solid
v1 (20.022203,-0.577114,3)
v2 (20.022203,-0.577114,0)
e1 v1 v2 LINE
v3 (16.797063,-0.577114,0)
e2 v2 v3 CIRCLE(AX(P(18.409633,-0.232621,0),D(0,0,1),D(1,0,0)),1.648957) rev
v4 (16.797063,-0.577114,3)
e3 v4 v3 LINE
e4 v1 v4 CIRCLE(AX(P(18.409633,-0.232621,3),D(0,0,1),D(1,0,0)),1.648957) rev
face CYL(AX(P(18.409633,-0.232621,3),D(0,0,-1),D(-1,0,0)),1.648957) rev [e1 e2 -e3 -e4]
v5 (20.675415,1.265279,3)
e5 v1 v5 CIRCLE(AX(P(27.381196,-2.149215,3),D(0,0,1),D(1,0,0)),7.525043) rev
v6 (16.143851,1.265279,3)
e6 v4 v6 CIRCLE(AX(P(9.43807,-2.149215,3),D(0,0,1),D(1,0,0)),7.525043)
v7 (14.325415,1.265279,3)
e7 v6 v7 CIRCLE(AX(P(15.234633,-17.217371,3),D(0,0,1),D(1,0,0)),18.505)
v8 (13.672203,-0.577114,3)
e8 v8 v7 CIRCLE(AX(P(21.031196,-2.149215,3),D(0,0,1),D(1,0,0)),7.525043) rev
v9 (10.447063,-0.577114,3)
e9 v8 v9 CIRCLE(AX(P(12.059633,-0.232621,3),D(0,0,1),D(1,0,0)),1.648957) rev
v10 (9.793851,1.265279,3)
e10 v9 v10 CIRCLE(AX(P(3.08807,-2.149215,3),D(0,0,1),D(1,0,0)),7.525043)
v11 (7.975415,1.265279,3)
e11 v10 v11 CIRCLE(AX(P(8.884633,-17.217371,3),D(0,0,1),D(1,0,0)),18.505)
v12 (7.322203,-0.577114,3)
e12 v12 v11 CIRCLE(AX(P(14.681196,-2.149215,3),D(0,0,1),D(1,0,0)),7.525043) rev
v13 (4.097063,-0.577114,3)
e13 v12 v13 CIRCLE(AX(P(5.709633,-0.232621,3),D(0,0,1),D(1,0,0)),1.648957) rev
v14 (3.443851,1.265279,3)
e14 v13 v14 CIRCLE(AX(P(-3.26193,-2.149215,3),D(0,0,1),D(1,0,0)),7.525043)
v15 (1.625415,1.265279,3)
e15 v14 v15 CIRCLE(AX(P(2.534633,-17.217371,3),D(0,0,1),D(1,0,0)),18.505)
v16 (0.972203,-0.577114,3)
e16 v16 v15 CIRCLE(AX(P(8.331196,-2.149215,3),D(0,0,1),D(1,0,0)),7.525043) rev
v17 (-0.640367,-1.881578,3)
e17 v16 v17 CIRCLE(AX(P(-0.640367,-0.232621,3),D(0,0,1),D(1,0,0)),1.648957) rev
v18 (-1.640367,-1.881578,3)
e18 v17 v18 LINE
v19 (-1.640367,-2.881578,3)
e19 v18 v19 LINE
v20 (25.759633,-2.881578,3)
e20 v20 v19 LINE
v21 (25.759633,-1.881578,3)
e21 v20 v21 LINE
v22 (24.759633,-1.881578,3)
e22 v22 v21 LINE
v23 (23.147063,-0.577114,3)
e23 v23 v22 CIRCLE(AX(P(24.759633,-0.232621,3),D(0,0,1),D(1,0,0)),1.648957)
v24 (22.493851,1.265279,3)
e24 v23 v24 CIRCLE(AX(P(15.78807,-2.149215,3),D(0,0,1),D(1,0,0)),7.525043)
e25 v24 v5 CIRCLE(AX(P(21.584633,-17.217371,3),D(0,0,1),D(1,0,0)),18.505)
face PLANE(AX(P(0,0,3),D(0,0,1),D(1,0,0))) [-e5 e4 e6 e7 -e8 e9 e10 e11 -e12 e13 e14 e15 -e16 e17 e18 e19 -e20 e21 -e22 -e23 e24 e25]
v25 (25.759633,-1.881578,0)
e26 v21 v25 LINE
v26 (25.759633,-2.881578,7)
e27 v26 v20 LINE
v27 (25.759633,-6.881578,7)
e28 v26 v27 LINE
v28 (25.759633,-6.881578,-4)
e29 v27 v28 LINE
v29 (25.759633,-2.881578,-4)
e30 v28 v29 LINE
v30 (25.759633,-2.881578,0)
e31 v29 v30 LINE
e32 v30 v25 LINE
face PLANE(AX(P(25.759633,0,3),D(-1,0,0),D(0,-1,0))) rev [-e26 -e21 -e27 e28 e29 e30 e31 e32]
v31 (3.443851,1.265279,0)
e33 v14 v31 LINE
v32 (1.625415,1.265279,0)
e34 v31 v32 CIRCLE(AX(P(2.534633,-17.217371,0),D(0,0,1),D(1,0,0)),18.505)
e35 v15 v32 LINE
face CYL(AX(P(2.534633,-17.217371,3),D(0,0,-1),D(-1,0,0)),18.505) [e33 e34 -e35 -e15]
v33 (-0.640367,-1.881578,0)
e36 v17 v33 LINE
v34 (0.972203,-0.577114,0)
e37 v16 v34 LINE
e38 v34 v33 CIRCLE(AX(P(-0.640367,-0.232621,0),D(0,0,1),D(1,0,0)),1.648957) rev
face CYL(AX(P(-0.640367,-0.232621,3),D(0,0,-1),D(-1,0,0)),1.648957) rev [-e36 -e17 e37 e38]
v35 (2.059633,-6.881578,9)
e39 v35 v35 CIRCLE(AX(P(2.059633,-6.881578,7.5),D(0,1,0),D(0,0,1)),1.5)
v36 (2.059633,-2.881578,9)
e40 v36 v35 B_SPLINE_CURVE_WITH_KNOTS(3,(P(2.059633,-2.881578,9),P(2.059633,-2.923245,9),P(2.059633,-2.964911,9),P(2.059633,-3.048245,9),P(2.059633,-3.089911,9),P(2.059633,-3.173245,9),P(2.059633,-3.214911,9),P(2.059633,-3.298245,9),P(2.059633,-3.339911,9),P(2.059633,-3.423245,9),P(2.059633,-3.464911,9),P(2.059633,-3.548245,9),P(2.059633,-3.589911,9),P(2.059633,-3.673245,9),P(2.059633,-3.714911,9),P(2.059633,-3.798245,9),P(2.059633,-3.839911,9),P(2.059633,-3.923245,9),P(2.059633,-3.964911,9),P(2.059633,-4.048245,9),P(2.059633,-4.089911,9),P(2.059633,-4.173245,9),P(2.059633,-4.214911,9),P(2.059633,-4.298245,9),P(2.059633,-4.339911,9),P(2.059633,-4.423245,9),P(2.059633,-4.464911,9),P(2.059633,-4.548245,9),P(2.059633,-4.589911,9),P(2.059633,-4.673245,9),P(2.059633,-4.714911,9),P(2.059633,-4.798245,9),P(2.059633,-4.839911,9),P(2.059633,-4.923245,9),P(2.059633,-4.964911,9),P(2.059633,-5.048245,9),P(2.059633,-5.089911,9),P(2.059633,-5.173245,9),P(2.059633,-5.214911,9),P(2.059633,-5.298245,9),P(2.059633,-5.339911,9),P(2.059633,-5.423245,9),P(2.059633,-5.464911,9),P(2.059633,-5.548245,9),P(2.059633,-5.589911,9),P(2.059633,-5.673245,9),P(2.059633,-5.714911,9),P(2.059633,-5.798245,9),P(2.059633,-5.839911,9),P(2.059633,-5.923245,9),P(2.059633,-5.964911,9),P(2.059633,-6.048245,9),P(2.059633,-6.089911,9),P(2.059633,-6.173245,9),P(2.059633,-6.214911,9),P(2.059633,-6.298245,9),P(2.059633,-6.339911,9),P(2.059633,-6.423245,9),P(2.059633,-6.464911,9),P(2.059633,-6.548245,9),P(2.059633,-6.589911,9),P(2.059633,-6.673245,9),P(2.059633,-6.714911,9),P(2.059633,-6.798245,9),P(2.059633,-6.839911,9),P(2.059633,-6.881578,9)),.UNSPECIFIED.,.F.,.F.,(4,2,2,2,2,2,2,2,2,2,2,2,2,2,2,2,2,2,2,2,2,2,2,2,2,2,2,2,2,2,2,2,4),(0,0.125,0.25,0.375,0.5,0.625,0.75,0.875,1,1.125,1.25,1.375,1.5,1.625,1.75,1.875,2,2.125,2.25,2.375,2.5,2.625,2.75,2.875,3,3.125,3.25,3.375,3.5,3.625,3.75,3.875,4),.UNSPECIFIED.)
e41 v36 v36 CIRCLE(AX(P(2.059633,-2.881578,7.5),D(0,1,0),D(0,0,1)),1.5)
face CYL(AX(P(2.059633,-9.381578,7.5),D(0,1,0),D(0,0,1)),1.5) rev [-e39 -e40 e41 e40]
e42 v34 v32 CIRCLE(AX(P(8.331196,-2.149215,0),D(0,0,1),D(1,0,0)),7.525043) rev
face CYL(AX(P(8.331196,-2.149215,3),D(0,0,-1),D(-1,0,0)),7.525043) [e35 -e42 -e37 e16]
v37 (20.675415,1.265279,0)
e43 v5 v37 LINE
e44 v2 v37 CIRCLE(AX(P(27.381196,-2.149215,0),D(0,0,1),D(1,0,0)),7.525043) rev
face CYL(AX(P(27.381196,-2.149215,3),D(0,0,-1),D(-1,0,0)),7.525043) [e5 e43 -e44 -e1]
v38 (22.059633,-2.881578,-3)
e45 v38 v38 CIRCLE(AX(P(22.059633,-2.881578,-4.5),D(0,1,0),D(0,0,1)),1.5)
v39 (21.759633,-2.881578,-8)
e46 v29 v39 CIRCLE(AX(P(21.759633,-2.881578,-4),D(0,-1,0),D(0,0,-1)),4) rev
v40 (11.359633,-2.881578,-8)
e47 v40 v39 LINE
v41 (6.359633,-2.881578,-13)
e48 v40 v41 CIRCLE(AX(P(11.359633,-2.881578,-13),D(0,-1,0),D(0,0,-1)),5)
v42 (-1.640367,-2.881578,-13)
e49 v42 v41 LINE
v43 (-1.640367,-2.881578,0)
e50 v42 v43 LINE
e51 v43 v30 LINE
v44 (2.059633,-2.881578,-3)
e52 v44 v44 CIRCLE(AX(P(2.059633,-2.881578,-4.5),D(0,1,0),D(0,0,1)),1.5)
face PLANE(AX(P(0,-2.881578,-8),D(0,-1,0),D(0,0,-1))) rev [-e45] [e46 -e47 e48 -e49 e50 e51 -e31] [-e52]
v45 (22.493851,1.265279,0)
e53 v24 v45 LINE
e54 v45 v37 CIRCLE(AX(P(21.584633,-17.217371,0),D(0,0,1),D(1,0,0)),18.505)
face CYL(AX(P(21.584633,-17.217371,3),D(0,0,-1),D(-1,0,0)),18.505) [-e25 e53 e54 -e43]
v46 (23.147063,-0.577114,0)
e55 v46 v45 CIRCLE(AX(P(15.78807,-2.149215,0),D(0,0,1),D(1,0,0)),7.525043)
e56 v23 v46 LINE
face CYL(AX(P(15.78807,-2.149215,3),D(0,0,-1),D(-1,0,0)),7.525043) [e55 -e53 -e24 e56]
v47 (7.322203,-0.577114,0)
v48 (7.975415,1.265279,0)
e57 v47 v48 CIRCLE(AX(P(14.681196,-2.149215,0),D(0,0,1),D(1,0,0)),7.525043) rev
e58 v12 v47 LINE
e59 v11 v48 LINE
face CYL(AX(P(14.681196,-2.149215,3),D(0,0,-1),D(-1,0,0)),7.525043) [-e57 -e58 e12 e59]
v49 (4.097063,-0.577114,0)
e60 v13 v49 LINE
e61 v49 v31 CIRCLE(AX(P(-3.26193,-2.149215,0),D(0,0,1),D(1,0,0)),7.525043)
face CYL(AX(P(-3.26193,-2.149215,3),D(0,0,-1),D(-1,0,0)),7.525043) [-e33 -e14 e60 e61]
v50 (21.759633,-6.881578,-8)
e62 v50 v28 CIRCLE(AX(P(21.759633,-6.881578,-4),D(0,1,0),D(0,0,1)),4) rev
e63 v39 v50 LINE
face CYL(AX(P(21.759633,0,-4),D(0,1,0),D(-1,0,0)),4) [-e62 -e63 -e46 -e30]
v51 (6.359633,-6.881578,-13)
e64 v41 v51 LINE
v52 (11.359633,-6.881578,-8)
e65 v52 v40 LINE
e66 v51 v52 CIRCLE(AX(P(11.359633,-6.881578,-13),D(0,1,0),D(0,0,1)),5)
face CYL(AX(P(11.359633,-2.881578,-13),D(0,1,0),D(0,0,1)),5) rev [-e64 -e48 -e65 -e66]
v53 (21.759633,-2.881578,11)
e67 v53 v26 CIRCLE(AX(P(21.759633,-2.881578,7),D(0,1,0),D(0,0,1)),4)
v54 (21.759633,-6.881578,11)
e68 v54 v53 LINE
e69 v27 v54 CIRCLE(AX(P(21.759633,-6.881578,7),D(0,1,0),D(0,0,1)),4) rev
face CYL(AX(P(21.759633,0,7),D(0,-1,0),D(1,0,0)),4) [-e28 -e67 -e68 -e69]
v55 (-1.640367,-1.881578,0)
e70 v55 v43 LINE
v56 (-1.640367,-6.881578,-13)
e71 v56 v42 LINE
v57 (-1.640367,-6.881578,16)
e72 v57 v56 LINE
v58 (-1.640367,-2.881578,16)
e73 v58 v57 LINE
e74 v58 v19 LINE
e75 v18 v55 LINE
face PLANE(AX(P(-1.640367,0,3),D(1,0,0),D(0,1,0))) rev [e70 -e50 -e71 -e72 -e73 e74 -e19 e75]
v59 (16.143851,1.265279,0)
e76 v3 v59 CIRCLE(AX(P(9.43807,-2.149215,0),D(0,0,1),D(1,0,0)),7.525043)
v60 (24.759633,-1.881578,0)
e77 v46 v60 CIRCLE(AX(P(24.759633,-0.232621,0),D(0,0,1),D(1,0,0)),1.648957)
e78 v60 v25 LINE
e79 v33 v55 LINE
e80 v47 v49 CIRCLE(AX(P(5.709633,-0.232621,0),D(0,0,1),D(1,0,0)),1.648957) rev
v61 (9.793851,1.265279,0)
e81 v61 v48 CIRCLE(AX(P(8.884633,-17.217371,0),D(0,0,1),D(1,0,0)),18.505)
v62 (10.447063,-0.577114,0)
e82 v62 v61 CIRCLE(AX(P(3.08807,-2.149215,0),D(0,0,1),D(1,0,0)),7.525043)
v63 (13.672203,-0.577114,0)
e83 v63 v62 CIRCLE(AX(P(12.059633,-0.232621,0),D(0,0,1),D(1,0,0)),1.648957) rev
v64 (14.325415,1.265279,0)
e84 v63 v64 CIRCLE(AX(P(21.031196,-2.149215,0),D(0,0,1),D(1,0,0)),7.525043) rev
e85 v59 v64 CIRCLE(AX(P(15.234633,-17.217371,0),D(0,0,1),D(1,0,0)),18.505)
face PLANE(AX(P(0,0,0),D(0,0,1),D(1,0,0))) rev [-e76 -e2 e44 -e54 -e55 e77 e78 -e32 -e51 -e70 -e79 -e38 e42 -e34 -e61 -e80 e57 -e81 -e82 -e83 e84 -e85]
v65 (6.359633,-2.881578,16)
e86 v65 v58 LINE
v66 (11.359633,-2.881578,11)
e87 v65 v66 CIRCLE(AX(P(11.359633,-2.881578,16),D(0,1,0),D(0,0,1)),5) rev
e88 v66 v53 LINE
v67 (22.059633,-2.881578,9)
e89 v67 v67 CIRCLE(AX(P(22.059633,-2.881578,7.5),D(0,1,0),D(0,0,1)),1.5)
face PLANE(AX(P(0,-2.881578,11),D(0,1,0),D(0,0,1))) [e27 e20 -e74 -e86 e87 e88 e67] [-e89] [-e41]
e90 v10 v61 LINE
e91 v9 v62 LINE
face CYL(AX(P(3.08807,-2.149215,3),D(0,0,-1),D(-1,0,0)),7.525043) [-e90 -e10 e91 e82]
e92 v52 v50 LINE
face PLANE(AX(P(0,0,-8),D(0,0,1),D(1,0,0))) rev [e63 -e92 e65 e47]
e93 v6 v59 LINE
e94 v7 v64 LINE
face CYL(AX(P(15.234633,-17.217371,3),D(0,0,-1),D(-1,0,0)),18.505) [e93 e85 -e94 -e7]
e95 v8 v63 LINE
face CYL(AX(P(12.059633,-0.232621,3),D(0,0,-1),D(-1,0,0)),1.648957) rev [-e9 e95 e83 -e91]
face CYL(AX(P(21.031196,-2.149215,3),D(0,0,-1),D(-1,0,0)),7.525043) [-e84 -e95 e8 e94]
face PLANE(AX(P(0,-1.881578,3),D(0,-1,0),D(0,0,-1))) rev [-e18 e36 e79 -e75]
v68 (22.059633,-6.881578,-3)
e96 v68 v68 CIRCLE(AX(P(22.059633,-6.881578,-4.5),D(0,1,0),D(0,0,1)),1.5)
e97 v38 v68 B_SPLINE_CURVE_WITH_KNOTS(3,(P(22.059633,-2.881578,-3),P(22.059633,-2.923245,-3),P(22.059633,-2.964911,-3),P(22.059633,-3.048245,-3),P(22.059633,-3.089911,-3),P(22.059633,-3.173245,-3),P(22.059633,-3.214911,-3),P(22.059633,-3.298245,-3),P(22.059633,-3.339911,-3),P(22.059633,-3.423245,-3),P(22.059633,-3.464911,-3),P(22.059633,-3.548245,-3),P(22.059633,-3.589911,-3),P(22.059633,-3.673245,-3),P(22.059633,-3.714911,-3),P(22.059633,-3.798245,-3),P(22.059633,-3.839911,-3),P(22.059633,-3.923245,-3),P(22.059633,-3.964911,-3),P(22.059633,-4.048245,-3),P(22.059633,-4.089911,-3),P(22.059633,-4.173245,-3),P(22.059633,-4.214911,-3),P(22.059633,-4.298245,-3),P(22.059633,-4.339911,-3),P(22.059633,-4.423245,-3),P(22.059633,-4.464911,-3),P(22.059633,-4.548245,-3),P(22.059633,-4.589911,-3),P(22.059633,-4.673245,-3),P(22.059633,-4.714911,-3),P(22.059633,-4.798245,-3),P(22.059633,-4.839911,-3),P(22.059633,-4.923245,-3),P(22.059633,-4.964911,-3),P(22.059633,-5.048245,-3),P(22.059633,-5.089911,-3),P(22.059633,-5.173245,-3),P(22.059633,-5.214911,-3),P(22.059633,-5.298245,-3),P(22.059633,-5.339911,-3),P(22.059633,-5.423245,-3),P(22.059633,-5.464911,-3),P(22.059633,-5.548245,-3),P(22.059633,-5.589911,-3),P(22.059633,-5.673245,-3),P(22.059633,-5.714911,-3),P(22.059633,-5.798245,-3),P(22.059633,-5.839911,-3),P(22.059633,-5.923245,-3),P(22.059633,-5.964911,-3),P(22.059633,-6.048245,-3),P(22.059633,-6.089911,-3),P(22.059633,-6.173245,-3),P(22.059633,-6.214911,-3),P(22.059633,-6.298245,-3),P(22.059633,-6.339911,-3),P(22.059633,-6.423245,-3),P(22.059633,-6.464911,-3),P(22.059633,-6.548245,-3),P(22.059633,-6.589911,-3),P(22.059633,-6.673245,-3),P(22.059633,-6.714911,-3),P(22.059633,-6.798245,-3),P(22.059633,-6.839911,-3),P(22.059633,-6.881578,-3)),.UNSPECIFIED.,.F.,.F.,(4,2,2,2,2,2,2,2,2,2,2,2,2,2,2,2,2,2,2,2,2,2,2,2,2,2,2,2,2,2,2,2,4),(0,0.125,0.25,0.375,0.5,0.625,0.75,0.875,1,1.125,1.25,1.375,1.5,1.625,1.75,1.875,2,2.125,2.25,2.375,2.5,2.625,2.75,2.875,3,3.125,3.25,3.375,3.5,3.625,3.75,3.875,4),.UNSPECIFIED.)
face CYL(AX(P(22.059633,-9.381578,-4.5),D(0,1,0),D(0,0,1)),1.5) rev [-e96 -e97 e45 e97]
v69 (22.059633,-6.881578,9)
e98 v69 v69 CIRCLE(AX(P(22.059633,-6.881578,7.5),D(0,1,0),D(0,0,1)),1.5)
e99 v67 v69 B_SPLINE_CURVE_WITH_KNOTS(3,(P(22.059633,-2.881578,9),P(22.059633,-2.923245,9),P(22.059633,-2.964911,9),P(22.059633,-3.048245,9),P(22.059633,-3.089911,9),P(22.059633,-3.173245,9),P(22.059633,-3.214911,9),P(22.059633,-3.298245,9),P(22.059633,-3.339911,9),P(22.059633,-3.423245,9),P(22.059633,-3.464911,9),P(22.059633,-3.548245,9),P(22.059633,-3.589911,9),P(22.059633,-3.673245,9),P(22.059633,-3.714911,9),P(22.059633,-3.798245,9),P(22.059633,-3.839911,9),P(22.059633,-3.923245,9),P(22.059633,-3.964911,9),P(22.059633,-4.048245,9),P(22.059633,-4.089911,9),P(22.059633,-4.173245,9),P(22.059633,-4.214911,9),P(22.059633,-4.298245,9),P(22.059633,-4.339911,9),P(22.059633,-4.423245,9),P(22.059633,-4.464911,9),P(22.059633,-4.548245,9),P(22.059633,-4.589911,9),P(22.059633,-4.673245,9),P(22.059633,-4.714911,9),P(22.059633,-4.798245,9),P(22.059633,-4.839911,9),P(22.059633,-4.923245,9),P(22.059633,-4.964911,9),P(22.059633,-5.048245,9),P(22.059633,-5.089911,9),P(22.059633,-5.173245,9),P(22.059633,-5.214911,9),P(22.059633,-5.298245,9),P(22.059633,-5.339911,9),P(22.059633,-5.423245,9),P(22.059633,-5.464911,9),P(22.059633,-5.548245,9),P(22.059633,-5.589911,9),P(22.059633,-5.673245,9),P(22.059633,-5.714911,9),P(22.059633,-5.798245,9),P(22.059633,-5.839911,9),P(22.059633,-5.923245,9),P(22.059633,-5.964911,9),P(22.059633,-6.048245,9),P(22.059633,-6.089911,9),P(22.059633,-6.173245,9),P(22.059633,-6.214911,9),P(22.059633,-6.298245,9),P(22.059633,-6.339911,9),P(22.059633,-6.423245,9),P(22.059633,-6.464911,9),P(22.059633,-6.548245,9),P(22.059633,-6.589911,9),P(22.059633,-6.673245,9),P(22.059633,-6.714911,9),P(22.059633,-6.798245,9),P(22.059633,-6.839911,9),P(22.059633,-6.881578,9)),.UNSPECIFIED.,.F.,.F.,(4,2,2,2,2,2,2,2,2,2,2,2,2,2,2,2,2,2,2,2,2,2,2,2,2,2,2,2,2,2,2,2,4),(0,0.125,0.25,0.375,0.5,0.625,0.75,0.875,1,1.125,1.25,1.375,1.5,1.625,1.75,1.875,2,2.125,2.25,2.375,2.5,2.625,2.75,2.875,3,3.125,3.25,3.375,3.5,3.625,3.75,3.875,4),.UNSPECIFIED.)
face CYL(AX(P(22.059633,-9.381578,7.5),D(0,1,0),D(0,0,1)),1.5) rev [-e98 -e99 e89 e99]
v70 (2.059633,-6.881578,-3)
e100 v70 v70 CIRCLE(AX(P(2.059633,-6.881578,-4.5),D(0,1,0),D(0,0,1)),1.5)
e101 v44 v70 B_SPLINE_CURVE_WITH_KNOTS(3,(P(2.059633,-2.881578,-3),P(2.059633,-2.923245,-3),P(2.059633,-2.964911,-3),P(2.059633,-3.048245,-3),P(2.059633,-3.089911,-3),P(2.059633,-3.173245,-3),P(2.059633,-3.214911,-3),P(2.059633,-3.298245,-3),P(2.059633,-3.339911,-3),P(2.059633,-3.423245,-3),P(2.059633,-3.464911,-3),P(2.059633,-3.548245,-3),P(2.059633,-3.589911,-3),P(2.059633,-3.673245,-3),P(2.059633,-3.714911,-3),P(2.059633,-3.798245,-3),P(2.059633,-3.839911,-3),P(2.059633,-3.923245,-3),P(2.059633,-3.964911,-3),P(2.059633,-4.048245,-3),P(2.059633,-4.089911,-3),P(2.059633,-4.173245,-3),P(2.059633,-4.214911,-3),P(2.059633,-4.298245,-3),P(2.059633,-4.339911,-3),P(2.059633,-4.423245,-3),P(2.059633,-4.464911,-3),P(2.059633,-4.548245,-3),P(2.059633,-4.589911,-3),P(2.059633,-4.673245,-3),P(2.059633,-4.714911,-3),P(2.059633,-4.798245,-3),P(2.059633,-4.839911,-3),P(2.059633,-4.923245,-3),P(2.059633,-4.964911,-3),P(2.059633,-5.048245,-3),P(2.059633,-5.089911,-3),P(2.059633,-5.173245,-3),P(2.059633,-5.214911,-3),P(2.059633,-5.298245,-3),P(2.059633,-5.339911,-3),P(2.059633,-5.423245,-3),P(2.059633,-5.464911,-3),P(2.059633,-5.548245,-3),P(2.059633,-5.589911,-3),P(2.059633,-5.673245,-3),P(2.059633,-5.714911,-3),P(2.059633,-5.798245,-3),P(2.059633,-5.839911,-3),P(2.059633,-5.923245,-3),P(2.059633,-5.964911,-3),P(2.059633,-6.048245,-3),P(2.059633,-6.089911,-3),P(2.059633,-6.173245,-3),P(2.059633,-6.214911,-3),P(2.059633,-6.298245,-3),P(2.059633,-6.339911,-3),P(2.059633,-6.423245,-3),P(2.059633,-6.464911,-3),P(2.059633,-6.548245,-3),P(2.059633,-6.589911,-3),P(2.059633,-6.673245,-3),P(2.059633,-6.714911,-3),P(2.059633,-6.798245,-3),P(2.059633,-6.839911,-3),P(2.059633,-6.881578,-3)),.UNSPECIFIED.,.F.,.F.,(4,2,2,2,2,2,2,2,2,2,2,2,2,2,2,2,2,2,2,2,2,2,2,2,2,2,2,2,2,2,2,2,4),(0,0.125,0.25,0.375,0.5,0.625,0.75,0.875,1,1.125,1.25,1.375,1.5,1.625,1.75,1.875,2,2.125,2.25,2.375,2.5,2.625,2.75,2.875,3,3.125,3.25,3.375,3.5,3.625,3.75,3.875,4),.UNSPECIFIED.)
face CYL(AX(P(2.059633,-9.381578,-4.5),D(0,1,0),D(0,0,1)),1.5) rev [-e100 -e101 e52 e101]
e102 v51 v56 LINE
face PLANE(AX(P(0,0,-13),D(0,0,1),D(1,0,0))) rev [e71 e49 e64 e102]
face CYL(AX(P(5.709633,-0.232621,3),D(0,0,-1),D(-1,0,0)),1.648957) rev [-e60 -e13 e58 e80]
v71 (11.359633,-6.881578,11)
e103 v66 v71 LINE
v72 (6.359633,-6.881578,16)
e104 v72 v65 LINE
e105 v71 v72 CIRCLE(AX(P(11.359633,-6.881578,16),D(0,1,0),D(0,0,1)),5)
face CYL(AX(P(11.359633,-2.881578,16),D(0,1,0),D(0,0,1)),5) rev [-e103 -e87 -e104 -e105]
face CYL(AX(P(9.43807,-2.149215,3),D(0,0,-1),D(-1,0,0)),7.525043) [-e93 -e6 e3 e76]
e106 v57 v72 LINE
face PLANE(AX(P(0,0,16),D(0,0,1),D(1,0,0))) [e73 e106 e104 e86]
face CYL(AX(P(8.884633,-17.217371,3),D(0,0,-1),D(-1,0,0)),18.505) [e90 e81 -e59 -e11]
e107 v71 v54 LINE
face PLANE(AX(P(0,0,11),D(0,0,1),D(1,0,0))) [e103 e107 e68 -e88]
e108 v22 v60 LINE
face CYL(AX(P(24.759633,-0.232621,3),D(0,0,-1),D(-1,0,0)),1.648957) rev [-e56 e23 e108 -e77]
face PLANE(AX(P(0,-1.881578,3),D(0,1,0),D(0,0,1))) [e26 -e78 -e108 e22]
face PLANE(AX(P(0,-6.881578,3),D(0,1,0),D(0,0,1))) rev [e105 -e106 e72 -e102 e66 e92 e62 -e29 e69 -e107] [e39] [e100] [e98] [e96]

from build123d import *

# Parameters (mm, degrees)
SKETCH_1_W          = 27.399999997
SKETCH_1_H          = 4
EXTRUDE_1_DEPTH     = 3
SKETCH_1_3_W        = 27.399999997
SKETCH_1_3_H        = 4
EXTRUDE_2_DEPTH     = 11
SKETCH_1_4_W        = 27.399999997
SKETCH_1_4_H        = 4
EXTRUDE_3_DEPTH     = 8
SKETCH_2_R          = 1.5
CUT_EXTRUDE_1_DEPTH = 6.5
FILLET_1_R          = 4
EXTRUDE_4_DEPTH     = 19
SKETCH_6_W          = 32.257266432
SKETCH_6_H          = 23.708854684
CUT_EXTRUDE_2_DEPTH = 21
SKETCH_7_W          = 8
SKETCH_7_H          = 4
EXTRUDE_5_DEPTH     = 5
SKETCH_8_W          = 8
SKETCH_8_H          = 4
EXTRUDE_6_DEPTH     = 5
FILLET_2_R          = 5


with BuildPart() as part:
    # 草图1 → 凸台-拉伸1 (new body)
    with BuildSketch(Plane.XY):
        with BuildLine():
            ThreePointArc((-0.337371922, -1.853501365), (-0.488220409, -1.87454383), (-0.640366957, -1.881577989))
            Line((-0.640366957, -1.881577989), (-1.640366957, -1.881577989))
            Line((-1.640366957, -1.881577989), (-1.640366957, -2.881577989))
            Line((-1.640366957, -2.881577989), (25.75963304, -2.881577989))
            Line((25.75963304, -2.881577989), (25.75963304, -1.88157799))
            Line((25.75963304, -1.88157799), (24.75963304, -1.88157799))
            ThreePointArc((24.75963304, -1.88157799), (24.607486492, -1.87454383), (24.456638005, -1.853501365))
            ThreePointArc((24.456638005, -1.853501365), (23.608703525, -1.413476758), (23.147062635, -0.577114262))
            ThreePointArc((23.147062635, -0.577114262), (22.880535784, 0.365382964), (22.493851477, 1.265278974))
            ThreePointArc((22.493851477, 1.265278974), (21.584633042, 1.287629087), (20.675414607, 1.265278974))
            ThreePointArc((20.675414607, 1.265278974), (20.288730299, 0.365382964), (20.022203448, -0.577114261))
            ThreePointArc((20.022203448, -0.577114261), (19.560562558, -1.413476758), (18.712628078, -1.853501365))
            ThreePointArc((18.712628078, -1.853501365), (18.409633042, -1.88157799), (18.106638005, -1.853501365))
            ThreePointArc((18.106638005, -1.853501365), (17.258703525, -1.413476758), (16.797062635, -0.577114262))
            ThreePointArc((16.797062635, -0.577114262), (16.530535784, 0.365382964), (16.143851477, 1.265278974))
            ThreePointArc((16.143851477, 1.265278974), (15.234633042, 1.287629087), (14.325414607, 1.265278974))
            ThreePointArc((14.325414607, 1.265278974), (13.938730299, 0.365382964), (13.672203448, -0.577114261))
            ThreePointArc((13.672203448, -0.577114261), (13.210562558, -1.413476758), (12.362628078, -1.853501365))
            ThreePointArc((12.362628078, -1.853501365), (12.059633042, -1.88157799), (11.756638005, -1.853501365))
            ThreePointArc((11.756638005, -1.853501365), (10.908703525, -1.413476758), (10.447062635, -0.577114262))
            ThreePointArc((10.447062635, -0.577114262), (10.180535784, 0.365382964), (9.793851477, 1.265278974))
            ThreePointArc((9.793851477, 1.265278974), (8.884633042, 1.287629087), (7.975414607, 1.265278974))
            ThreePointArc((7.975414607, 1.265278974), (7.588730299, 0.365382964), (7.322203448, -0.577114261))
            ThreePointArc((7.322203448, -0.577114261), (6.860562558, -1.413476758), (6.012628078, -1.853501365))
            ThreePointArc((6.012628078, -1.853501365), (5.709633042, -1.88157799), (5.406638005, -1.853501365))
            ThreePointArc((5.406638005, -1.853501365), (4.558703525, -1.413476758), (4.097062635, -0.577114262))
            ThreePointArc((4.097062635, -0.577114262), (3.830535784, 0.365382964), (3.443851477, 1.265278974))
            ThreePointArc((3.443851477, 1.265278974), (2.534633042, 1.287629087), (1.625414607, 1.265278974))
            ThreePointArc((1.625414607, 1.265278974), (1.238730299, 0.365382964), (0.972203448, -0.577114261))
            ThreePointArc((0.972203448, -0.577114261), (0.510562558, -1.413476758), (-0.337371922, -1.853501365))
        make_face()
        with Locations((12.059633041, -4.881577989)):
            Rectangle(SKETCH_1_W, SKETCH_1_H)
    extrude(amount=EXTRUDE_1_DEPTH)

    # 草图1<3> → 凸台-拉伸2 (add)
    with BuildSketch(Plane.XY):
        with Locations((12.059633041, -4.881577989)):
            Rectangle(SKETCH_1_3_W, SKETCH_1_3_H)
    extrude(amount=EXTRUDE_2_DEPTH)

    # 草图1<4> → 凸台-拉伸3 (add)
    with BuildSketch(Plane.XY):
        with Locations((12.059633041, -4.881577989)):
            Rectangle(SKETCH_1_4_W, SKETCH_1_4_H)
    extrude(amount=-EXTRUDE_3_DEPTH)

    # 草图2 → 切除-拉伸1 (cut)
    with BuildSketch(Plane(origin=(0, -2.881577989, 0), x_dir=(1, 0, 0), z_dir=(0, 1, 0))):
        with Locations(Location((2.059633042, 4.5, 0), (0, 0, 270))):
            Circle(SKETCH_2_R)
        with Locations(Location((22.059633042, 4.5, 0), (0, 0, 270))):
            Circle(SKETCH_2_R)
        with Locations(Location((22.059633042, -7.5, 0), (0, 0, 270))):
            Circle(SKETCH_2_R)
        with Locations(Location((2.059633042, -7.5, 0), (0, 0, 270))):
            Circle(SKETCH_2_R)
    extrude(amount=-CUT_EXTRUDE_1_DEPTH, mode=Mode.SUBTRACT)

    # 圆角1
    fillet_1_edges = [part.edges().sort_by_distance(p)[0] for p in [
        (25.75963304, -4.881577989, 11),
        (25.75963304, -4.881577989, -8),
    ]]
    fillet(fillet_1_edges, radius=FILLET_1_R)

    # 草图4 → 凸台-拉伸4 (add)
    with BuildSketch(Plane(origin=(0, 0, -8), x_dir=(-1, 0, 0), z_dir=(0, 0, -1))):
        with BuildLine():
            Line((-7.559633042, -6.881577989), (-12.559633042, -6.881577989))
            Line((-12.559633042, -6.881577989), (-12.559633042, -12.881577989))
            ThreePointArc((-12.559633042, -12.881577989), (-9.530706272, -19.615542978), (-2.482680937, -21.816910897))
            Line((-2.482680937, -21.816910897), (-2.482680937, -19.612245623))
            ThreePointArc((-2.482680937, -19.612245623), (-6.148073578, -17.096946581), (-7.559633042, -12.881577989))
            Line((-7.559633042, -12.881577989), (-7.559633042, -6.881577989))
        make_face()
    extrude(amount=-EXTRUDE_4_DEPTH)

    # 草图6 → 切除-拉伸2 (cut)
    with BuildSketch(Plane.XZ.offset(6.881577989)):
        with Locations((13.405653676, 0.508195322)):
            Rectangle(SKETCH_6_W, SKETCH_6_H)
    extrude(amount=CUT_EXTRUDE_2_DEPTH, mode=Mode.SUBTRACT)

    # 草图7 → 凸台-拉伸5 (add)
    with BuildSketch(Plane.XY.offset(11)):
        with Locations((2.359633043, -4.881577989)):
            Rectangle(SKETCH_7_W, SKETCH_7_H)
    extrude(amount=EXTRUDE_5_DEPTH)

    # 草图8 → 凸台-拉伸6 (add)
    with BuildSketch(Plane(origin=(0, 0, -8), x_dir=(-1, 0, 0), z_dir=(0, 0, -1))):
        with Locations((-2.359633043, -4.881577989)):
            Rectangle(SKETCH_8_W, SKETCH_8_H)
    extrude(amount=EXTRUDE_6_DEPTH)

    # 圆角2
    fillet_2_edges = [part.edges().sort_by_distance(p)[0] for p in [
        (6.359633043, -4.881577989, 11),
        (6.359633043, -4.881577989, -8),
    ]]
    fillet(fillet_2_edges, radius=FILLET_2_R - 0.0001)  # a hair under: the kernel refuses the full size


solid = part.part
